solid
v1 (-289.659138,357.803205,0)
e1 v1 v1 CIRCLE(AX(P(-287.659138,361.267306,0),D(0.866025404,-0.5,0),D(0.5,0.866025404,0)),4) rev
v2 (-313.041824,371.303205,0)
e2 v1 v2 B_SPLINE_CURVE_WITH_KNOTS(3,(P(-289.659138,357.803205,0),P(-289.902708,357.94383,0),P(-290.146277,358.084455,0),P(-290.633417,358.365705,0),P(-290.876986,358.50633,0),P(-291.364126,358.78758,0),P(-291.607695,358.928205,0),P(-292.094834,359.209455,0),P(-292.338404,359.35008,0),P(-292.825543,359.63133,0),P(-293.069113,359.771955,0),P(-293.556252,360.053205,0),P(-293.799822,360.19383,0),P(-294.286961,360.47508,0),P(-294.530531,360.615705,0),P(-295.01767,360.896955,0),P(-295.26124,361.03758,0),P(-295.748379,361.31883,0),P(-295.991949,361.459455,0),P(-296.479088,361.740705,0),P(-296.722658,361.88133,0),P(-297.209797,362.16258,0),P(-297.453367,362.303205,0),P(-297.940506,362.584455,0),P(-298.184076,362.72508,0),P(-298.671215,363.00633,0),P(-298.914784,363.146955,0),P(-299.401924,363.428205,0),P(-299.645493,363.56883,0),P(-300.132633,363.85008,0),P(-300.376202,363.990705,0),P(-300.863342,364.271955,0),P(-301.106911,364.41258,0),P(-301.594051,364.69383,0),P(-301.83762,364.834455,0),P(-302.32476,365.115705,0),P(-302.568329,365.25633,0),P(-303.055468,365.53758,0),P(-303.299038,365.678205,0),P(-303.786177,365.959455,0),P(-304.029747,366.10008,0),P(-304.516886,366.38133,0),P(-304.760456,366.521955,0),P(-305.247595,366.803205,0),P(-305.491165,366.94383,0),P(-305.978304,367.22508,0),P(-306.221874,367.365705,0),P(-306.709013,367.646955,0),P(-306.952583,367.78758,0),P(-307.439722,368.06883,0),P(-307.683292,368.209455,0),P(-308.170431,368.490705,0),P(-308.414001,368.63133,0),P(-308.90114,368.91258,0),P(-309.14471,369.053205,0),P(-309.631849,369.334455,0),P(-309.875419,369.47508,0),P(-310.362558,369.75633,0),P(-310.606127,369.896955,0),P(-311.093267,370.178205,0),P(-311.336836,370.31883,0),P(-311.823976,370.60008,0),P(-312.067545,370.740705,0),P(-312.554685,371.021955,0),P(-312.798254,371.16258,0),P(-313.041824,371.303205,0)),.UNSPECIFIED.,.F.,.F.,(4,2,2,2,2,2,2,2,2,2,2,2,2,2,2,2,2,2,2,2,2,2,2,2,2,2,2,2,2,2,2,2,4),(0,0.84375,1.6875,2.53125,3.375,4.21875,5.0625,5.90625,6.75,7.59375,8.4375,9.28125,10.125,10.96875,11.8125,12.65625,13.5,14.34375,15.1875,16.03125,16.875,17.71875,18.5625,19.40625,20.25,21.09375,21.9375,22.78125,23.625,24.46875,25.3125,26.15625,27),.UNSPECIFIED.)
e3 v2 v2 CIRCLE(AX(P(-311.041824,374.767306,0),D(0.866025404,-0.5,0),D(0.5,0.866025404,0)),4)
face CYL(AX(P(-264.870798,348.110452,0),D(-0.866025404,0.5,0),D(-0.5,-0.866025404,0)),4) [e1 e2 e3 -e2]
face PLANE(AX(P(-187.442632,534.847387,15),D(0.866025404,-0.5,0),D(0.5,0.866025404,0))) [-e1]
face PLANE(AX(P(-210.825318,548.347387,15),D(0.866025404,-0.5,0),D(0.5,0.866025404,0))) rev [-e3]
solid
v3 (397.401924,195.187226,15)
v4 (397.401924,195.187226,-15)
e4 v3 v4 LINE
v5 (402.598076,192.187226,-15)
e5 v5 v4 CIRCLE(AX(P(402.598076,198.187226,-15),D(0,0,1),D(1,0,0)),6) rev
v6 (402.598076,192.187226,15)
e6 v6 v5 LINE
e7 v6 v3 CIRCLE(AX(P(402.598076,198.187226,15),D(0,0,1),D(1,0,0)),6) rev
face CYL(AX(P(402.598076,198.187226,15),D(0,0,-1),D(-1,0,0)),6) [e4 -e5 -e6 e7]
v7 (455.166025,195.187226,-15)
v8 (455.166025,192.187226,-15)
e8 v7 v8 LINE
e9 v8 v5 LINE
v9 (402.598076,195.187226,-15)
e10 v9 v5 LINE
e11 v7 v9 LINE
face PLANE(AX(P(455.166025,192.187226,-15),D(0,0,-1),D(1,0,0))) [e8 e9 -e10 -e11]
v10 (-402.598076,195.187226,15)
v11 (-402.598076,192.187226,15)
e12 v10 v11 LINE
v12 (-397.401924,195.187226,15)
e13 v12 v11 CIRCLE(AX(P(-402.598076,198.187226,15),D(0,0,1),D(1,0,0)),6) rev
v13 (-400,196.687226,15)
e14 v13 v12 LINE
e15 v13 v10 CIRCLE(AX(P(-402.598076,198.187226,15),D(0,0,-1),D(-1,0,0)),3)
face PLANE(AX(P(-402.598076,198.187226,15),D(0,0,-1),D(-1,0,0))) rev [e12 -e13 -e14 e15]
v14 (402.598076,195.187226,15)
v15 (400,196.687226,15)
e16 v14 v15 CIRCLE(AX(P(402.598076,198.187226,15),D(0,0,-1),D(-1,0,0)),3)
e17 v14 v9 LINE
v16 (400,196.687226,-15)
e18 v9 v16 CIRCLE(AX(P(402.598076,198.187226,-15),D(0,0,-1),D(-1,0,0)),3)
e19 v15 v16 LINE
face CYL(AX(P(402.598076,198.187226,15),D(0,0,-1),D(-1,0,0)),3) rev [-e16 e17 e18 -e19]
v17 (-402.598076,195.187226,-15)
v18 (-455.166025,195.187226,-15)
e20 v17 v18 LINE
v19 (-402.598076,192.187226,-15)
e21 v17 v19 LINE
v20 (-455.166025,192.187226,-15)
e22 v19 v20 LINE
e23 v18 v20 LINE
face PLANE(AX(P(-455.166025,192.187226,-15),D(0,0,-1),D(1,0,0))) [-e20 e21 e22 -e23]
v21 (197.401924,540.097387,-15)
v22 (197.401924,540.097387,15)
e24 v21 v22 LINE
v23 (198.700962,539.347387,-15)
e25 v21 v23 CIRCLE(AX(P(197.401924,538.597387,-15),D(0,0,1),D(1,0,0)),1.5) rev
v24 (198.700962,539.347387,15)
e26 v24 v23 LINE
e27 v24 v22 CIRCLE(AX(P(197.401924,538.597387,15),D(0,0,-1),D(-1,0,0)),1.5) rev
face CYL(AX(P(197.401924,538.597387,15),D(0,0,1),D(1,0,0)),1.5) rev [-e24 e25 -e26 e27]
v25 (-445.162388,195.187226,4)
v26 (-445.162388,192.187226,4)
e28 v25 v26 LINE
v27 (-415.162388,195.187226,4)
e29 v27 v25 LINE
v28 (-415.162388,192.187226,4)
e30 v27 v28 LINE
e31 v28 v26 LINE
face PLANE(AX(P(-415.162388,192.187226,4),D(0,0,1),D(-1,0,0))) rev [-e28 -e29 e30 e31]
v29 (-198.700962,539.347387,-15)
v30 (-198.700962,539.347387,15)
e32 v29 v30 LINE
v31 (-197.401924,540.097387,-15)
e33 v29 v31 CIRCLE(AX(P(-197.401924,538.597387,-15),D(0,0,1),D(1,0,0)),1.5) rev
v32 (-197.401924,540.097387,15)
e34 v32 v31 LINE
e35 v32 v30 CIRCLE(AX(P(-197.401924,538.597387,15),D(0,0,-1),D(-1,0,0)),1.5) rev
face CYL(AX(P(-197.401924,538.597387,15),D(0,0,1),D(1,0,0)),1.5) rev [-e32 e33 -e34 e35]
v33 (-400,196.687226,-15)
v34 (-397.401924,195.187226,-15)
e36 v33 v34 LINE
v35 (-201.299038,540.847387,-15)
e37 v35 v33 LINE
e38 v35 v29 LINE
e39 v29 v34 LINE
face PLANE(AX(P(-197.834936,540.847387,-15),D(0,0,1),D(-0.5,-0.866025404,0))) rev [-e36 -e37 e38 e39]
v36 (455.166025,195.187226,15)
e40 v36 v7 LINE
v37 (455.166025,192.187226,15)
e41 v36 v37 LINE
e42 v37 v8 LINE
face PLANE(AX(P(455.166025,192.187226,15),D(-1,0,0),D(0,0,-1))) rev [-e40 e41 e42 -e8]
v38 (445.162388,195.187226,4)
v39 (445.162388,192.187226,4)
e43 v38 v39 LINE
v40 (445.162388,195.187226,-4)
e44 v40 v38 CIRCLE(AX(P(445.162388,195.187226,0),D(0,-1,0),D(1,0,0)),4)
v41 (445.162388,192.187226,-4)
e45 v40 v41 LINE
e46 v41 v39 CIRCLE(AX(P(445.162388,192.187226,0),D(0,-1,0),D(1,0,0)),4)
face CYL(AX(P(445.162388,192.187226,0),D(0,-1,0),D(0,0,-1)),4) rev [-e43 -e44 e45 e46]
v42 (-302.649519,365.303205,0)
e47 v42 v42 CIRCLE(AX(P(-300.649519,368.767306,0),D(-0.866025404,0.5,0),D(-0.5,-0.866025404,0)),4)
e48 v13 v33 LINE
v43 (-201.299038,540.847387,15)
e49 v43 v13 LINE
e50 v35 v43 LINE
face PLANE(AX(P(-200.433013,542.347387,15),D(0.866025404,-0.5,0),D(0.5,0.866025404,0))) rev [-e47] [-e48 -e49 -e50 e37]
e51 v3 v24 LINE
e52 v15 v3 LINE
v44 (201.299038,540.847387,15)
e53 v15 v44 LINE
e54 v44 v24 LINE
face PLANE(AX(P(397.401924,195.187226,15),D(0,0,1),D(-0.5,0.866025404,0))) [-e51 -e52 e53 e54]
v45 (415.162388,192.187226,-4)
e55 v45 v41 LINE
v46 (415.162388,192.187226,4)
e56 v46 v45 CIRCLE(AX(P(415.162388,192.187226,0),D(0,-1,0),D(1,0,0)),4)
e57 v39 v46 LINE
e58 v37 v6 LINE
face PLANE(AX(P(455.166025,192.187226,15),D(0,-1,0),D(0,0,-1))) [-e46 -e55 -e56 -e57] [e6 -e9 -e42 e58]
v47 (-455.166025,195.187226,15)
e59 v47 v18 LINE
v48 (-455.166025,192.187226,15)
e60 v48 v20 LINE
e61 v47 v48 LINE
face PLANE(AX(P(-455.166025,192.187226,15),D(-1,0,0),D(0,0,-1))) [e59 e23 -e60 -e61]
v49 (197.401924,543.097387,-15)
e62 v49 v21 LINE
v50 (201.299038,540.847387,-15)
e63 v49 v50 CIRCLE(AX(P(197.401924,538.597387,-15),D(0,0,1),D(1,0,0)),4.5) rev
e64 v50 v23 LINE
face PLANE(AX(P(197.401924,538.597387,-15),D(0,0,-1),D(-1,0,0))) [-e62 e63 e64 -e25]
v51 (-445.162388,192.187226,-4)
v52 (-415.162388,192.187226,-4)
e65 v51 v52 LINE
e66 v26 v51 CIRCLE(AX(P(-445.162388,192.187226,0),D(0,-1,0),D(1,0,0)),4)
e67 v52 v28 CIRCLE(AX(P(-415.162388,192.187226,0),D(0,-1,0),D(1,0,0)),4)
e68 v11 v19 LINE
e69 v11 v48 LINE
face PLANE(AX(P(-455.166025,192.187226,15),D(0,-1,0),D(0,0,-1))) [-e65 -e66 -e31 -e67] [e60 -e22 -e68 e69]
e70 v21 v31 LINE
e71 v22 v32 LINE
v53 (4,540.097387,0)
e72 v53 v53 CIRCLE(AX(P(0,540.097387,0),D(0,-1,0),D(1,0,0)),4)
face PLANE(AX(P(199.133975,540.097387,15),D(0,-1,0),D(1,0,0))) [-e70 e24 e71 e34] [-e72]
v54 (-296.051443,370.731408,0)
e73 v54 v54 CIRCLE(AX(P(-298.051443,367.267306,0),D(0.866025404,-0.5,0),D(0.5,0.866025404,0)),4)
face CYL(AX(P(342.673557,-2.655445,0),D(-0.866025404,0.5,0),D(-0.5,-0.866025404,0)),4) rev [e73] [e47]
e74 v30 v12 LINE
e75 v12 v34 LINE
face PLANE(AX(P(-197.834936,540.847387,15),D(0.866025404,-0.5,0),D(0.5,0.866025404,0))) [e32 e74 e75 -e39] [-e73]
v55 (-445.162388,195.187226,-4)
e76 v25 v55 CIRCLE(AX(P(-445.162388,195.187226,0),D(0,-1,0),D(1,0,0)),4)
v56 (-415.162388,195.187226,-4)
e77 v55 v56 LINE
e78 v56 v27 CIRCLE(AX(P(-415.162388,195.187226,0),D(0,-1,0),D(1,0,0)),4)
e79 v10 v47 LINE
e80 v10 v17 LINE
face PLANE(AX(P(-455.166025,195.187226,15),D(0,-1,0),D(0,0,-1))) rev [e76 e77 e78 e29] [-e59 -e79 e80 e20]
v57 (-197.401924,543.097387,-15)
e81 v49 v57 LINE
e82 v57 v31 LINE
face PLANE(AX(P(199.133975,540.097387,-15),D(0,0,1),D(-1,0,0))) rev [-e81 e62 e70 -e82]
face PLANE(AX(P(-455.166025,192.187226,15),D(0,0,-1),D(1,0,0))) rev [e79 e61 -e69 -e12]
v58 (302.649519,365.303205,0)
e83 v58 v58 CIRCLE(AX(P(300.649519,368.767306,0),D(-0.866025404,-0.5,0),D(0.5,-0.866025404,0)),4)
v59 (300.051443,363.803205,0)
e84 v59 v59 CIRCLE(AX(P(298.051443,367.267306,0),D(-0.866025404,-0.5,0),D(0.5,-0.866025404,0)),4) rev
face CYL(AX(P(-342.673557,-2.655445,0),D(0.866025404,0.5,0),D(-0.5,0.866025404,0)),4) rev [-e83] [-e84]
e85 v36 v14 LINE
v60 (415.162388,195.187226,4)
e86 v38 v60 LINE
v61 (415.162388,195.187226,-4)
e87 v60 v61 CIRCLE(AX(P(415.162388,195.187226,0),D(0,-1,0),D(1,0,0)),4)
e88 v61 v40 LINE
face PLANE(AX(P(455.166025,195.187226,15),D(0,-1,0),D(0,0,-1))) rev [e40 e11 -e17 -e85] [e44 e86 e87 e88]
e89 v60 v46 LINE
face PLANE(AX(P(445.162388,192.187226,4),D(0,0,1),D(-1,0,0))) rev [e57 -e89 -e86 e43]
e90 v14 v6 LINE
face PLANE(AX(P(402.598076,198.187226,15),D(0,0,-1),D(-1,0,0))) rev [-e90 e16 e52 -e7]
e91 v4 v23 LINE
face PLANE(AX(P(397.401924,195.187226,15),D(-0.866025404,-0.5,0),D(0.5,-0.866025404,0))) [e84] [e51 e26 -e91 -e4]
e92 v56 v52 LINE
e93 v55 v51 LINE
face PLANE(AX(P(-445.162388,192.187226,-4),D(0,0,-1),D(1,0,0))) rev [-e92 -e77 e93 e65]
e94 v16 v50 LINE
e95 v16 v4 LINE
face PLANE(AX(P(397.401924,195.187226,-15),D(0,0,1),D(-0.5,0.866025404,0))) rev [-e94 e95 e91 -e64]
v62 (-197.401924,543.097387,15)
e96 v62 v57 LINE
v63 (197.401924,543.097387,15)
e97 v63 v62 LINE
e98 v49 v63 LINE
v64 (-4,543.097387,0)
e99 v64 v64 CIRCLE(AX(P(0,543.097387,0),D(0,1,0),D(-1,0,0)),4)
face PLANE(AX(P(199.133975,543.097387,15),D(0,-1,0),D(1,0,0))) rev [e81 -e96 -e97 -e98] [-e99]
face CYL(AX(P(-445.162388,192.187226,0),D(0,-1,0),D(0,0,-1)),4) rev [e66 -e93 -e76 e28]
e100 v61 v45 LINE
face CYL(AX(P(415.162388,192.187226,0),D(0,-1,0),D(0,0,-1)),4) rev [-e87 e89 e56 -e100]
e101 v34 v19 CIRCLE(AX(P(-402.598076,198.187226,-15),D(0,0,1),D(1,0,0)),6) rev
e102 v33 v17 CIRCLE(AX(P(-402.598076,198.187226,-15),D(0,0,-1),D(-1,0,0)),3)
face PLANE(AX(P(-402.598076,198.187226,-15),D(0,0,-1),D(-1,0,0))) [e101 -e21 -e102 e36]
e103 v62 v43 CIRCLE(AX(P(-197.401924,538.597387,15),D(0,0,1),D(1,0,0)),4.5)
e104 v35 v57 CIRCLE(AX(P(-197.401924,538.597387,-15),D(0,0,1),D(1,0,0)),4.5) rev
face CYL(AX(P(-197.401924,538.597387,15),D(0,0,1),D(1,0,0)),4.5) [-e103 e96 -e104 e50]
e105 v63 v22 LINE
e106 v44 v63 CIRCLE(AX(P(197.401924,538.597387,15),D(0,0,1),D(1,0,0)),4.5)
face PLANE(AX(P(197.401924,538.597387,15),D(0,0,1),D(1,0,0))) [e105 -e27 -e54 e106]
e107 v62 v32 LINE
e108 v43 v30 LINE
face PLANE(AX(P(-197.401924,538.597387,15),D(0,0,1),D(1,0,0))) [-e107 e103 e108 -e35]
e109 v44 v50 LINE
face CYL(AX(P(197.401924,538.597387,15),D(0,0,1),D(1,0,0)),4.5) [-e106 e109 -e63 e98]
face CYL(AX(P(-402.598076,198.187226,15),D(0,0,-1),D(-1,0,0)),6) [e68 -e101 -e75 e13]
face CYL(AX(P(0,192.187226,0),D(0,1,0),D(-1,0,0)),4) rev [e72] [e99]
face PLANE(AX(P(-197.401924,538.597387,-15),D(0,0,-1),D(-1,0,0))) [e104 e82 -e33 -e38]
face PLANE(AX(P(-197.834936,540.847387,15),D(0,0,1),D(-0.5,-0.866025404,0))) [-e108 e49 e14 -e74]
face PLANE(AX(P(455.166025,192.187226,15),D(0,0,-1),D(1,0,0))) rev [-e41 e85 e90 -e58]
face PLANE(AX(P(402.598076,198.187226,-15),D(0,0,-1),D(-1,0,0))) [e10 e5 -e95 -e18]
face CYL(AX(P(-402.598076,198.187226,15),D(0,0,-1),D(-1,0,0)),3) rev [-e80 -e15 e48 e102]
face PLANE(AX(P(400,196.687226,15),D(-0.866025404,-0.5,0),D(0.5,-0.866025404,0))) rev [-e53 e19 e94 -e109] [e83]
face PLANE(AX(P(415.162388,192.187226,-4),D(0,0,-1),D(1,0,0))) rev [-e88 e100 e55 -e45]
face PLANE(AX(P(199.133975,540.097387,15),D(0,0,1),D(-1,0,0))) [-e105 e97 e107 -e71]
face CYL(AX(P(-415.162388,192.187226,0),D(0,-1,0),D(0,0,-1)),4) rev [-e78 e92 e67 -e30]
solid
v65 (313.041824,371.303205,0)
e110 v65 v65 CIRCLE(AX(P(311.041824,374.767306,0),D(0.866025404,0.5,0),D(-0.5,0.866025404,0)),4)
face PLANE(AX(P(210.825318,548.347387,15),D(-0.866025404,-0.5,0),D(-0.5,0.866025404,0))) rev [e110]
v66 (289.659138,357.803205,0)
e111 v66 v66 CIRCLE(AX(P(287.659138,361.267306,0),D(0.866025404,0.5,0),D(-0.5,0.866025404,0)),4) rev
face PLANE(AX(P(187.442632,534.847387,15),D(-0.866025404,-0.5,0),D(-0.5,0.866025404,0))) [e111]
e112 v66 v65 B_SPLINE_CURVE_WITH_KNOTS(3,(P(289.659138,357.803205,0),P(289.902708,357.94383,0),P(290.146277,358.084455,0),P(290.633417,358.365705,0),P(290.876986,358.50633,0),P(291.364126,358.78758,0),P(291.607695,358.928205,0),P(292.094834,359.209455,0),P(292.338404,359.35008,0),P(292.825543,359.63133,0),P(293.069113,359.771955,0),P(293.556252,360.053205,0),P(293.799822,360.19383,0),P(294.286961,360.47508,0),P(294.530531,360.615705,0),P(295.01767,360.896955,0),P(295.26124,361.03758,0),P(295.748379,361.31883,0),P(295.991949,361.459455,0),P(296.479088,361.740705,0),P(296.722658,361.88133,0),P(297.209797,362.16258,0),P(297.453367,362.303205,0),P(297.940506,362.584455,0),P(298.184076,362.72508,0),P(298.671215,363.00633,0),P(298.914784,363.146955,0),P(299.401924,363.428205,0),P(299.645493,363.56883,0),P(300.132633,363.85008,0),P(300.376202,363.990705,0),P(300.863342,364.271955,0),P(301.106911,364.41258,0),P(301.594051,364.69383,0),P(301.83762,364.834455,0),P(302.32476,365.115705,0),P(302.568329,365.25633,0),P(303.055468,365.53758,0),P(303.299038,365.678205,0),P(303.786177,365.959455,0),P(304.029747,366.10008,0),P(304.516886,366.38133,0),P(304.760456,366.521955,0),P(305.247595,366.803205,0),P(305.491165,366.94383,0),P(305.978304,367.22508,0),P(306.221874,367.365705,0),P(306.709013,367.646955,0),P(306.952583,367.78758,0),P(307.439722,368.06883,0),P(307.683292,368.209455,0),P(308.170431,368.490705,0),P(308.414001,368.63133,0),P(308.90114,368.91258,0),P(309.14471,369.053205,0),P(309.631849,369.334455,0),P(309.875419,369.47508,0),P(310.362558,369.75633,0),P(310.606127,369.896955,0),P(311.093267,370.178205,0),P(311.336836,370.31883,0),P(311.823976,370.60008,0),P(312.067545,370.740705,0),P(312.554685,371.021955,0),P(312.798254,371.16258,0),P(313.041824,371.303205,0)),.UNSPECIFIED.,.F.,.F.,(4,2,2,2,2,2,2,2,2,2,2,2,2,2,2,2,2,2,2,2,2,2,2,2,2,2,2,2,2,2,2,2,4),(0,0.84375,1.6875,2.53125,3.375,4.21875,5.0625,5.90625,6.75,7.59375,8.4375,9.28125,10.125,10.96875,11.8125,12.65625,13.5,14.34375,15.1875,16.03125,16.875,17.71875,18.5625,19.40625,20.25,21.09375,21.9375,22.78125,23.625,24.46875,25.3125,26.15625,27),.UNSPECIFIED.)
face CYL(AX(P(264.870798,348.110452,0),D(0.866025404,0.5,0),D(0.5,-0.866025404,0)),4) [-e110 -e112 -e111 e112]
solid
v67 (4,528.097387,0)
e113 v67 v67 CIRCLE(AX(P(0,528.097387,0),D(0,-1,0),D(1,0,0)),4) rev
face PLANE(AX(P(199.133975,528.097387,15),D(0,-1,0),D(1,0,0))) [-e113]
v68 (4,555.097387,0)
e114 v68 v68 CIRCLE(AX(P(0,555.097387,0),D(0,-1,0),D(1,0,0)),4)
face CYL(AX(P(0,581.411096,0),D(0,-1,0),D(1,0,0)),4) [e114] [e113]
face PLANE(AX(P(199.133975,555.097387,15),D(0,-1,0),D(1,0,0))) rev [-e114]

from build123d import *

# Parameters (mm, degrees)
EXTRUDE_1_DEPTH        = 15
CUT_EXTRUDE_1_REACH    = 576.925
SHEET_START            = -15
SHEET_METAL_2_DEPTH    = 30
SHEET_METAL_2_2_DEPTH  = 30
EXTRUDE_2_DEPTH        = 12
EXTRUDE_2_DEPTH_BACK   = 15
SKETCH_4_R             = 4
SKETCH_4_2_R           = 4
CUT_EXTRUDE_5_DEPTH    = 900.582139681
EXTRUDE_1_2_DEPTH      = 12
EXTRUDE_1_2_DEPTH_BACK = 15
SKETCH_3_R             = 4
SKETCH_3_2_R           = 4
CUT_EXTRUDE_6_DEPTH    = 575.925257869


# Read off the part's stored shape, not the designer's step: Преобразовать-Твердое тело2
with BuildPart() as part:
    # Эскиз1 → Extrude 1 (new, symmetric)
    with BuildSketch(Plane.XY):
        with BuildLine():
            Line((-455.166025404, 195.187225691), (-402.598076211, 195.187225691))
            ThreePointArc((-402.598076211, 195.187225691), (-401.098076211, 195.58914948), (-400, 196.687225691))
            Line((-400, 196.687225691), (-200.433012702, 542.347387205))
            ThreePointArc((-200.433012702, 542.347387205), (-199.883974596, 542.896425311), (-199.133974596, 543.097387205))
            Line((-199.133974596, 543.097387205), (199.133974596, 543.097387205))
            ThreePointArc((199.133974596, 543.097387205), (199.883974596, 542.896425311), (200.433012702, 542.347387205))
            Line((200.433012702, 542.347387205), (400, 196.687225691))
            ThreePointArc((400, 196.687225691), (401.098076211, 195.58914948), (402.598076211, 195.187225691))
            Line((402.598076211, 195.187225691), (455.166025404, 195.187225691))
            Line((455.166025404, 195.187225691), (455.166025404, 192.187225691))
            Line((455.166025404, 192.187225691), (402.598076211, 192.187225691))
            ThreePointArc((402.598076211, 192.187225691), (399.598076211, 192.991073269), (397.401923789, 195.187225691))
            Line((397.401923789, 195.187225691), (198.267949192, 540.097387205))
            Line((198.267949192, 540.097387205), (-198.267949192, 540.097387205))
            Line((-198.267949192, 540.097387205), (-397.401923789, 195.187225691))
            ThreePointArc((-397.401923789, 195.187225691), (-399.598076211, 192.991073269), (-402.598076211, 192.187225691))
            Line((-402.598076211, 192.187225691), (-455.166025404, 192.187225691))
            Line((-455.166025404, 192.187225691), (-455.166025404, 195.187225691))
        make_face()
    extrude(amount=EXTRUDE_1_DEPTH, both=True)

    # Эскиз2 → Вырез-Вытянуть1 (cut, up to next)
    with BuildSketch(Plane.XZ.offset(-192.187225691), mode=Mode.PRIVATE) as cut_extrude_1_sk1:
        with BuildLine():
            Line((-445.16238786, -4), (-415.16238786, -4))
            ThreePointArc((-415.16238786, -4), (-411.16238786, 0), (-415.16238786, 4))
            Line((-415.16238786, 4), (-445.16238786, 4))
            ThreePointArc((-445.16238786, 4), (-449.16238786, 0), (-445.16238786, -4))
        make_face()
    cut_extrude_1_tool1 = extrude(cut_extrude_1_sk1.sketch, amount=-CUT_EXTRUDE_1_REACH, mode=Mode.PRIVATE) & part.part
    # Эскиз2 → Вырез-Вытянуть1 (cut, up to next)
    with BuildSketch(Plane.XZ.offset(-192.187225691), mode=Mode.PRIVATE) as cut_extrude_1_sk2:
        with BuildLine():
            Line((445.16238786, 4), (415.16238786, 4))
            ThreePointArc((415.16238786, 4), (411.16238786, 0), (415.16238786, -4))
            Line((415.16238786, -4), (445.16238786, -4))
            ThreePointArc((445.16238786, -4), (449.16238786, 0), (445.16238786, 4))
        make_face()
    cut_extrude_1_tool2 = extrude(cut_extrude_1_sk2.sketch, amount=-CUT_EXTRUDE_1_REACH, mode=Mode.PRIVATE) & part.part
    add(cut_extrude_1_tool1.solids().sort_by_distance((-430.162388, 192.187226, 0))[0], mode=Mode.SUBTRACT)
    add(cut_extrude_1_tool2.solids().sort_by_distance((430.162388, 192.187226, 0))[0], mode=Mode.SUBTRACT)

    # Sheet Metal 2 outline → Sheet Metal 2 (cut)
    with BuildSketch(Plane.XY.offset(SHEET_START)):
        with BuildLine():
            Line((199.133974596, 543.097387205), (197.401923789, 543.097387205))
            ThreePointArc((197.401923789, 543.097387205), (199.651923789, 542.494501522), (201.299038106, 540.847387205))
            Line((201.299038106, 540.847387205), (200.433012702, 542.347387205))
            ThreePointArc((200.433012702, 542.347387205), (199.883974596, 542.896425311), (199.133974596, 543.097387205))
        make_face()
        with BuildLine():
            ThreePointArc((-201.299038106, 540.847387205), (-199.651923789, 542.494501522), (-197.401923789, 543.097387205))
            Line((-197.401923789, 543.097387205), (-199.133974596, 543.097387205))
            ThreePointArc((-199.133974596, 543.097387205), (-199.883974596, 542.896425311), (-200.433012702, 542.347387205))
            Line((-200.433012702, 542.347387205), (-201.299038106, 540.847387205))
        make_face()
    extrude(amount=SHEET_METAL_2_DEPTH, mode=Mode.SUBTRACT)

    # Sheet Metal 2 2 outline → Sheet Metal 2 2 (add)
    with BuildSketch(Plane.XY.offset(SHEET_START)):
        with BuildLine():
            Line((198.267949192, 540.097387205), (197.401923789, 540.097387205))
            ThreePointArc((197.401923789, 540.097387205), (198.151923789, 539.896425311), (198.700961894, 539.347387205))
            Line((198.700961894, 539.347387205), (198.267949192, 540.097387205))
        make_face()
        with BuildLine():
            ThreePointArc((-198.700961894, 539.347387205), (-198.151923789, 539.896425311), (-197.401923789, 540.097387205))
            Line((-197.401923789, 540.097387205), (-198.267949192, 540.097387205))
            Line((-198.267949192, 540.097387205), (-198.700961894, 539.347387205))
        make_face()
    extrude(amount=SHEET_METAL_2_2_DEPTH)

    # Эскиз4<2> → Вырез-Вытянуть5 (cut, through all)
    with BuildSketch(Plane(origin=(-385.168067024, 222.37688718, 0), x_dir=(0, 0, 1), z_dir=(-0.8660254037844389, 0.49999999999999983, 0))):
        with Locations(Location((0, 169.037095943, 0), (0, 0, 270))):
            Circle(SKETCH_4_2_R)
    cut_extrude_5 = extrude(amount=-CUT_EXTRUDE_5_DEPTH, mode=Mode.SUBTRACT)

    # Эскиз3<2> → Вырез-Вытянуть6 (cut, through all)
    with BuildSketch(Plane(origin=(0, 543.097387205, 0), x_dir=(1, 0, 0), z_dir=(0, 1, 0))):
        Circle(SKETCH_3_2_R)
    extrude(amount=-CUT_EXTRUDE_6_DEPTH, mode=Mode.SUBTRACT)

    # Зеркальное отражение6: Вырез-Вытянуть5 across plane
    add(cut_extrude_5.mirror(Plane(origin=(0, 0, 0), x_dir=(0, 0, 1), z_dir=(1, 0, 0))), mode=Mode.SUBTRACT)


with BuildPart() as body_2:
    # Sketch 4 → Бобышка-Вытянуть2 (new, two sides: drawn at the far end of the back side and taken through both)
    with BuildSketch(Plane(origin=(-385.168067024, 222.37688718, 0), x_dir=(0, 0, 1), z_dir=(-0.8660254037844389, 0.49999999999999983, 0)).offset(-EXTRUDE_2_DEPTH_BACK)):
        with Locations(Location((0, 169.037095943, 0), (0, 0, 270))):
            Circle(SKETCH_4_R)
    extrude(amount=EXTRUDE_2_DEPTH + EXTRUDE_2_DEPTH_BACK)


with BuildPart() as body_3:
    # Sketch 3 → Extrude 1 2 (new, two sides: drawn at the far end of the back side and taken through both)
    with BuildSketch(Plane(origin=(0, 543.097387205, 0), x_dir=(1, 0, 0), z_dir=(0, 1, 0)).offset(-EXTRUDE_1_2_DEPTH_BACK)):
        Circle(SKETCH_3_R)
    extrude(amount=EXTRUDE_1_2_DEPTH + EXTRUDE_1_2_DEPTH_BACK)


with BuildPart() as body_4:
    # Зеркальное отражение5: mirrored copy
    add(body_2.part.mirror(Plane(origin=(0, 0, 0), x_dir=(0, 0, 1), z_dir=(1, 0, 0))))


solid = Compound([part.part, body_2.part, body_3.part, body_4.part])
